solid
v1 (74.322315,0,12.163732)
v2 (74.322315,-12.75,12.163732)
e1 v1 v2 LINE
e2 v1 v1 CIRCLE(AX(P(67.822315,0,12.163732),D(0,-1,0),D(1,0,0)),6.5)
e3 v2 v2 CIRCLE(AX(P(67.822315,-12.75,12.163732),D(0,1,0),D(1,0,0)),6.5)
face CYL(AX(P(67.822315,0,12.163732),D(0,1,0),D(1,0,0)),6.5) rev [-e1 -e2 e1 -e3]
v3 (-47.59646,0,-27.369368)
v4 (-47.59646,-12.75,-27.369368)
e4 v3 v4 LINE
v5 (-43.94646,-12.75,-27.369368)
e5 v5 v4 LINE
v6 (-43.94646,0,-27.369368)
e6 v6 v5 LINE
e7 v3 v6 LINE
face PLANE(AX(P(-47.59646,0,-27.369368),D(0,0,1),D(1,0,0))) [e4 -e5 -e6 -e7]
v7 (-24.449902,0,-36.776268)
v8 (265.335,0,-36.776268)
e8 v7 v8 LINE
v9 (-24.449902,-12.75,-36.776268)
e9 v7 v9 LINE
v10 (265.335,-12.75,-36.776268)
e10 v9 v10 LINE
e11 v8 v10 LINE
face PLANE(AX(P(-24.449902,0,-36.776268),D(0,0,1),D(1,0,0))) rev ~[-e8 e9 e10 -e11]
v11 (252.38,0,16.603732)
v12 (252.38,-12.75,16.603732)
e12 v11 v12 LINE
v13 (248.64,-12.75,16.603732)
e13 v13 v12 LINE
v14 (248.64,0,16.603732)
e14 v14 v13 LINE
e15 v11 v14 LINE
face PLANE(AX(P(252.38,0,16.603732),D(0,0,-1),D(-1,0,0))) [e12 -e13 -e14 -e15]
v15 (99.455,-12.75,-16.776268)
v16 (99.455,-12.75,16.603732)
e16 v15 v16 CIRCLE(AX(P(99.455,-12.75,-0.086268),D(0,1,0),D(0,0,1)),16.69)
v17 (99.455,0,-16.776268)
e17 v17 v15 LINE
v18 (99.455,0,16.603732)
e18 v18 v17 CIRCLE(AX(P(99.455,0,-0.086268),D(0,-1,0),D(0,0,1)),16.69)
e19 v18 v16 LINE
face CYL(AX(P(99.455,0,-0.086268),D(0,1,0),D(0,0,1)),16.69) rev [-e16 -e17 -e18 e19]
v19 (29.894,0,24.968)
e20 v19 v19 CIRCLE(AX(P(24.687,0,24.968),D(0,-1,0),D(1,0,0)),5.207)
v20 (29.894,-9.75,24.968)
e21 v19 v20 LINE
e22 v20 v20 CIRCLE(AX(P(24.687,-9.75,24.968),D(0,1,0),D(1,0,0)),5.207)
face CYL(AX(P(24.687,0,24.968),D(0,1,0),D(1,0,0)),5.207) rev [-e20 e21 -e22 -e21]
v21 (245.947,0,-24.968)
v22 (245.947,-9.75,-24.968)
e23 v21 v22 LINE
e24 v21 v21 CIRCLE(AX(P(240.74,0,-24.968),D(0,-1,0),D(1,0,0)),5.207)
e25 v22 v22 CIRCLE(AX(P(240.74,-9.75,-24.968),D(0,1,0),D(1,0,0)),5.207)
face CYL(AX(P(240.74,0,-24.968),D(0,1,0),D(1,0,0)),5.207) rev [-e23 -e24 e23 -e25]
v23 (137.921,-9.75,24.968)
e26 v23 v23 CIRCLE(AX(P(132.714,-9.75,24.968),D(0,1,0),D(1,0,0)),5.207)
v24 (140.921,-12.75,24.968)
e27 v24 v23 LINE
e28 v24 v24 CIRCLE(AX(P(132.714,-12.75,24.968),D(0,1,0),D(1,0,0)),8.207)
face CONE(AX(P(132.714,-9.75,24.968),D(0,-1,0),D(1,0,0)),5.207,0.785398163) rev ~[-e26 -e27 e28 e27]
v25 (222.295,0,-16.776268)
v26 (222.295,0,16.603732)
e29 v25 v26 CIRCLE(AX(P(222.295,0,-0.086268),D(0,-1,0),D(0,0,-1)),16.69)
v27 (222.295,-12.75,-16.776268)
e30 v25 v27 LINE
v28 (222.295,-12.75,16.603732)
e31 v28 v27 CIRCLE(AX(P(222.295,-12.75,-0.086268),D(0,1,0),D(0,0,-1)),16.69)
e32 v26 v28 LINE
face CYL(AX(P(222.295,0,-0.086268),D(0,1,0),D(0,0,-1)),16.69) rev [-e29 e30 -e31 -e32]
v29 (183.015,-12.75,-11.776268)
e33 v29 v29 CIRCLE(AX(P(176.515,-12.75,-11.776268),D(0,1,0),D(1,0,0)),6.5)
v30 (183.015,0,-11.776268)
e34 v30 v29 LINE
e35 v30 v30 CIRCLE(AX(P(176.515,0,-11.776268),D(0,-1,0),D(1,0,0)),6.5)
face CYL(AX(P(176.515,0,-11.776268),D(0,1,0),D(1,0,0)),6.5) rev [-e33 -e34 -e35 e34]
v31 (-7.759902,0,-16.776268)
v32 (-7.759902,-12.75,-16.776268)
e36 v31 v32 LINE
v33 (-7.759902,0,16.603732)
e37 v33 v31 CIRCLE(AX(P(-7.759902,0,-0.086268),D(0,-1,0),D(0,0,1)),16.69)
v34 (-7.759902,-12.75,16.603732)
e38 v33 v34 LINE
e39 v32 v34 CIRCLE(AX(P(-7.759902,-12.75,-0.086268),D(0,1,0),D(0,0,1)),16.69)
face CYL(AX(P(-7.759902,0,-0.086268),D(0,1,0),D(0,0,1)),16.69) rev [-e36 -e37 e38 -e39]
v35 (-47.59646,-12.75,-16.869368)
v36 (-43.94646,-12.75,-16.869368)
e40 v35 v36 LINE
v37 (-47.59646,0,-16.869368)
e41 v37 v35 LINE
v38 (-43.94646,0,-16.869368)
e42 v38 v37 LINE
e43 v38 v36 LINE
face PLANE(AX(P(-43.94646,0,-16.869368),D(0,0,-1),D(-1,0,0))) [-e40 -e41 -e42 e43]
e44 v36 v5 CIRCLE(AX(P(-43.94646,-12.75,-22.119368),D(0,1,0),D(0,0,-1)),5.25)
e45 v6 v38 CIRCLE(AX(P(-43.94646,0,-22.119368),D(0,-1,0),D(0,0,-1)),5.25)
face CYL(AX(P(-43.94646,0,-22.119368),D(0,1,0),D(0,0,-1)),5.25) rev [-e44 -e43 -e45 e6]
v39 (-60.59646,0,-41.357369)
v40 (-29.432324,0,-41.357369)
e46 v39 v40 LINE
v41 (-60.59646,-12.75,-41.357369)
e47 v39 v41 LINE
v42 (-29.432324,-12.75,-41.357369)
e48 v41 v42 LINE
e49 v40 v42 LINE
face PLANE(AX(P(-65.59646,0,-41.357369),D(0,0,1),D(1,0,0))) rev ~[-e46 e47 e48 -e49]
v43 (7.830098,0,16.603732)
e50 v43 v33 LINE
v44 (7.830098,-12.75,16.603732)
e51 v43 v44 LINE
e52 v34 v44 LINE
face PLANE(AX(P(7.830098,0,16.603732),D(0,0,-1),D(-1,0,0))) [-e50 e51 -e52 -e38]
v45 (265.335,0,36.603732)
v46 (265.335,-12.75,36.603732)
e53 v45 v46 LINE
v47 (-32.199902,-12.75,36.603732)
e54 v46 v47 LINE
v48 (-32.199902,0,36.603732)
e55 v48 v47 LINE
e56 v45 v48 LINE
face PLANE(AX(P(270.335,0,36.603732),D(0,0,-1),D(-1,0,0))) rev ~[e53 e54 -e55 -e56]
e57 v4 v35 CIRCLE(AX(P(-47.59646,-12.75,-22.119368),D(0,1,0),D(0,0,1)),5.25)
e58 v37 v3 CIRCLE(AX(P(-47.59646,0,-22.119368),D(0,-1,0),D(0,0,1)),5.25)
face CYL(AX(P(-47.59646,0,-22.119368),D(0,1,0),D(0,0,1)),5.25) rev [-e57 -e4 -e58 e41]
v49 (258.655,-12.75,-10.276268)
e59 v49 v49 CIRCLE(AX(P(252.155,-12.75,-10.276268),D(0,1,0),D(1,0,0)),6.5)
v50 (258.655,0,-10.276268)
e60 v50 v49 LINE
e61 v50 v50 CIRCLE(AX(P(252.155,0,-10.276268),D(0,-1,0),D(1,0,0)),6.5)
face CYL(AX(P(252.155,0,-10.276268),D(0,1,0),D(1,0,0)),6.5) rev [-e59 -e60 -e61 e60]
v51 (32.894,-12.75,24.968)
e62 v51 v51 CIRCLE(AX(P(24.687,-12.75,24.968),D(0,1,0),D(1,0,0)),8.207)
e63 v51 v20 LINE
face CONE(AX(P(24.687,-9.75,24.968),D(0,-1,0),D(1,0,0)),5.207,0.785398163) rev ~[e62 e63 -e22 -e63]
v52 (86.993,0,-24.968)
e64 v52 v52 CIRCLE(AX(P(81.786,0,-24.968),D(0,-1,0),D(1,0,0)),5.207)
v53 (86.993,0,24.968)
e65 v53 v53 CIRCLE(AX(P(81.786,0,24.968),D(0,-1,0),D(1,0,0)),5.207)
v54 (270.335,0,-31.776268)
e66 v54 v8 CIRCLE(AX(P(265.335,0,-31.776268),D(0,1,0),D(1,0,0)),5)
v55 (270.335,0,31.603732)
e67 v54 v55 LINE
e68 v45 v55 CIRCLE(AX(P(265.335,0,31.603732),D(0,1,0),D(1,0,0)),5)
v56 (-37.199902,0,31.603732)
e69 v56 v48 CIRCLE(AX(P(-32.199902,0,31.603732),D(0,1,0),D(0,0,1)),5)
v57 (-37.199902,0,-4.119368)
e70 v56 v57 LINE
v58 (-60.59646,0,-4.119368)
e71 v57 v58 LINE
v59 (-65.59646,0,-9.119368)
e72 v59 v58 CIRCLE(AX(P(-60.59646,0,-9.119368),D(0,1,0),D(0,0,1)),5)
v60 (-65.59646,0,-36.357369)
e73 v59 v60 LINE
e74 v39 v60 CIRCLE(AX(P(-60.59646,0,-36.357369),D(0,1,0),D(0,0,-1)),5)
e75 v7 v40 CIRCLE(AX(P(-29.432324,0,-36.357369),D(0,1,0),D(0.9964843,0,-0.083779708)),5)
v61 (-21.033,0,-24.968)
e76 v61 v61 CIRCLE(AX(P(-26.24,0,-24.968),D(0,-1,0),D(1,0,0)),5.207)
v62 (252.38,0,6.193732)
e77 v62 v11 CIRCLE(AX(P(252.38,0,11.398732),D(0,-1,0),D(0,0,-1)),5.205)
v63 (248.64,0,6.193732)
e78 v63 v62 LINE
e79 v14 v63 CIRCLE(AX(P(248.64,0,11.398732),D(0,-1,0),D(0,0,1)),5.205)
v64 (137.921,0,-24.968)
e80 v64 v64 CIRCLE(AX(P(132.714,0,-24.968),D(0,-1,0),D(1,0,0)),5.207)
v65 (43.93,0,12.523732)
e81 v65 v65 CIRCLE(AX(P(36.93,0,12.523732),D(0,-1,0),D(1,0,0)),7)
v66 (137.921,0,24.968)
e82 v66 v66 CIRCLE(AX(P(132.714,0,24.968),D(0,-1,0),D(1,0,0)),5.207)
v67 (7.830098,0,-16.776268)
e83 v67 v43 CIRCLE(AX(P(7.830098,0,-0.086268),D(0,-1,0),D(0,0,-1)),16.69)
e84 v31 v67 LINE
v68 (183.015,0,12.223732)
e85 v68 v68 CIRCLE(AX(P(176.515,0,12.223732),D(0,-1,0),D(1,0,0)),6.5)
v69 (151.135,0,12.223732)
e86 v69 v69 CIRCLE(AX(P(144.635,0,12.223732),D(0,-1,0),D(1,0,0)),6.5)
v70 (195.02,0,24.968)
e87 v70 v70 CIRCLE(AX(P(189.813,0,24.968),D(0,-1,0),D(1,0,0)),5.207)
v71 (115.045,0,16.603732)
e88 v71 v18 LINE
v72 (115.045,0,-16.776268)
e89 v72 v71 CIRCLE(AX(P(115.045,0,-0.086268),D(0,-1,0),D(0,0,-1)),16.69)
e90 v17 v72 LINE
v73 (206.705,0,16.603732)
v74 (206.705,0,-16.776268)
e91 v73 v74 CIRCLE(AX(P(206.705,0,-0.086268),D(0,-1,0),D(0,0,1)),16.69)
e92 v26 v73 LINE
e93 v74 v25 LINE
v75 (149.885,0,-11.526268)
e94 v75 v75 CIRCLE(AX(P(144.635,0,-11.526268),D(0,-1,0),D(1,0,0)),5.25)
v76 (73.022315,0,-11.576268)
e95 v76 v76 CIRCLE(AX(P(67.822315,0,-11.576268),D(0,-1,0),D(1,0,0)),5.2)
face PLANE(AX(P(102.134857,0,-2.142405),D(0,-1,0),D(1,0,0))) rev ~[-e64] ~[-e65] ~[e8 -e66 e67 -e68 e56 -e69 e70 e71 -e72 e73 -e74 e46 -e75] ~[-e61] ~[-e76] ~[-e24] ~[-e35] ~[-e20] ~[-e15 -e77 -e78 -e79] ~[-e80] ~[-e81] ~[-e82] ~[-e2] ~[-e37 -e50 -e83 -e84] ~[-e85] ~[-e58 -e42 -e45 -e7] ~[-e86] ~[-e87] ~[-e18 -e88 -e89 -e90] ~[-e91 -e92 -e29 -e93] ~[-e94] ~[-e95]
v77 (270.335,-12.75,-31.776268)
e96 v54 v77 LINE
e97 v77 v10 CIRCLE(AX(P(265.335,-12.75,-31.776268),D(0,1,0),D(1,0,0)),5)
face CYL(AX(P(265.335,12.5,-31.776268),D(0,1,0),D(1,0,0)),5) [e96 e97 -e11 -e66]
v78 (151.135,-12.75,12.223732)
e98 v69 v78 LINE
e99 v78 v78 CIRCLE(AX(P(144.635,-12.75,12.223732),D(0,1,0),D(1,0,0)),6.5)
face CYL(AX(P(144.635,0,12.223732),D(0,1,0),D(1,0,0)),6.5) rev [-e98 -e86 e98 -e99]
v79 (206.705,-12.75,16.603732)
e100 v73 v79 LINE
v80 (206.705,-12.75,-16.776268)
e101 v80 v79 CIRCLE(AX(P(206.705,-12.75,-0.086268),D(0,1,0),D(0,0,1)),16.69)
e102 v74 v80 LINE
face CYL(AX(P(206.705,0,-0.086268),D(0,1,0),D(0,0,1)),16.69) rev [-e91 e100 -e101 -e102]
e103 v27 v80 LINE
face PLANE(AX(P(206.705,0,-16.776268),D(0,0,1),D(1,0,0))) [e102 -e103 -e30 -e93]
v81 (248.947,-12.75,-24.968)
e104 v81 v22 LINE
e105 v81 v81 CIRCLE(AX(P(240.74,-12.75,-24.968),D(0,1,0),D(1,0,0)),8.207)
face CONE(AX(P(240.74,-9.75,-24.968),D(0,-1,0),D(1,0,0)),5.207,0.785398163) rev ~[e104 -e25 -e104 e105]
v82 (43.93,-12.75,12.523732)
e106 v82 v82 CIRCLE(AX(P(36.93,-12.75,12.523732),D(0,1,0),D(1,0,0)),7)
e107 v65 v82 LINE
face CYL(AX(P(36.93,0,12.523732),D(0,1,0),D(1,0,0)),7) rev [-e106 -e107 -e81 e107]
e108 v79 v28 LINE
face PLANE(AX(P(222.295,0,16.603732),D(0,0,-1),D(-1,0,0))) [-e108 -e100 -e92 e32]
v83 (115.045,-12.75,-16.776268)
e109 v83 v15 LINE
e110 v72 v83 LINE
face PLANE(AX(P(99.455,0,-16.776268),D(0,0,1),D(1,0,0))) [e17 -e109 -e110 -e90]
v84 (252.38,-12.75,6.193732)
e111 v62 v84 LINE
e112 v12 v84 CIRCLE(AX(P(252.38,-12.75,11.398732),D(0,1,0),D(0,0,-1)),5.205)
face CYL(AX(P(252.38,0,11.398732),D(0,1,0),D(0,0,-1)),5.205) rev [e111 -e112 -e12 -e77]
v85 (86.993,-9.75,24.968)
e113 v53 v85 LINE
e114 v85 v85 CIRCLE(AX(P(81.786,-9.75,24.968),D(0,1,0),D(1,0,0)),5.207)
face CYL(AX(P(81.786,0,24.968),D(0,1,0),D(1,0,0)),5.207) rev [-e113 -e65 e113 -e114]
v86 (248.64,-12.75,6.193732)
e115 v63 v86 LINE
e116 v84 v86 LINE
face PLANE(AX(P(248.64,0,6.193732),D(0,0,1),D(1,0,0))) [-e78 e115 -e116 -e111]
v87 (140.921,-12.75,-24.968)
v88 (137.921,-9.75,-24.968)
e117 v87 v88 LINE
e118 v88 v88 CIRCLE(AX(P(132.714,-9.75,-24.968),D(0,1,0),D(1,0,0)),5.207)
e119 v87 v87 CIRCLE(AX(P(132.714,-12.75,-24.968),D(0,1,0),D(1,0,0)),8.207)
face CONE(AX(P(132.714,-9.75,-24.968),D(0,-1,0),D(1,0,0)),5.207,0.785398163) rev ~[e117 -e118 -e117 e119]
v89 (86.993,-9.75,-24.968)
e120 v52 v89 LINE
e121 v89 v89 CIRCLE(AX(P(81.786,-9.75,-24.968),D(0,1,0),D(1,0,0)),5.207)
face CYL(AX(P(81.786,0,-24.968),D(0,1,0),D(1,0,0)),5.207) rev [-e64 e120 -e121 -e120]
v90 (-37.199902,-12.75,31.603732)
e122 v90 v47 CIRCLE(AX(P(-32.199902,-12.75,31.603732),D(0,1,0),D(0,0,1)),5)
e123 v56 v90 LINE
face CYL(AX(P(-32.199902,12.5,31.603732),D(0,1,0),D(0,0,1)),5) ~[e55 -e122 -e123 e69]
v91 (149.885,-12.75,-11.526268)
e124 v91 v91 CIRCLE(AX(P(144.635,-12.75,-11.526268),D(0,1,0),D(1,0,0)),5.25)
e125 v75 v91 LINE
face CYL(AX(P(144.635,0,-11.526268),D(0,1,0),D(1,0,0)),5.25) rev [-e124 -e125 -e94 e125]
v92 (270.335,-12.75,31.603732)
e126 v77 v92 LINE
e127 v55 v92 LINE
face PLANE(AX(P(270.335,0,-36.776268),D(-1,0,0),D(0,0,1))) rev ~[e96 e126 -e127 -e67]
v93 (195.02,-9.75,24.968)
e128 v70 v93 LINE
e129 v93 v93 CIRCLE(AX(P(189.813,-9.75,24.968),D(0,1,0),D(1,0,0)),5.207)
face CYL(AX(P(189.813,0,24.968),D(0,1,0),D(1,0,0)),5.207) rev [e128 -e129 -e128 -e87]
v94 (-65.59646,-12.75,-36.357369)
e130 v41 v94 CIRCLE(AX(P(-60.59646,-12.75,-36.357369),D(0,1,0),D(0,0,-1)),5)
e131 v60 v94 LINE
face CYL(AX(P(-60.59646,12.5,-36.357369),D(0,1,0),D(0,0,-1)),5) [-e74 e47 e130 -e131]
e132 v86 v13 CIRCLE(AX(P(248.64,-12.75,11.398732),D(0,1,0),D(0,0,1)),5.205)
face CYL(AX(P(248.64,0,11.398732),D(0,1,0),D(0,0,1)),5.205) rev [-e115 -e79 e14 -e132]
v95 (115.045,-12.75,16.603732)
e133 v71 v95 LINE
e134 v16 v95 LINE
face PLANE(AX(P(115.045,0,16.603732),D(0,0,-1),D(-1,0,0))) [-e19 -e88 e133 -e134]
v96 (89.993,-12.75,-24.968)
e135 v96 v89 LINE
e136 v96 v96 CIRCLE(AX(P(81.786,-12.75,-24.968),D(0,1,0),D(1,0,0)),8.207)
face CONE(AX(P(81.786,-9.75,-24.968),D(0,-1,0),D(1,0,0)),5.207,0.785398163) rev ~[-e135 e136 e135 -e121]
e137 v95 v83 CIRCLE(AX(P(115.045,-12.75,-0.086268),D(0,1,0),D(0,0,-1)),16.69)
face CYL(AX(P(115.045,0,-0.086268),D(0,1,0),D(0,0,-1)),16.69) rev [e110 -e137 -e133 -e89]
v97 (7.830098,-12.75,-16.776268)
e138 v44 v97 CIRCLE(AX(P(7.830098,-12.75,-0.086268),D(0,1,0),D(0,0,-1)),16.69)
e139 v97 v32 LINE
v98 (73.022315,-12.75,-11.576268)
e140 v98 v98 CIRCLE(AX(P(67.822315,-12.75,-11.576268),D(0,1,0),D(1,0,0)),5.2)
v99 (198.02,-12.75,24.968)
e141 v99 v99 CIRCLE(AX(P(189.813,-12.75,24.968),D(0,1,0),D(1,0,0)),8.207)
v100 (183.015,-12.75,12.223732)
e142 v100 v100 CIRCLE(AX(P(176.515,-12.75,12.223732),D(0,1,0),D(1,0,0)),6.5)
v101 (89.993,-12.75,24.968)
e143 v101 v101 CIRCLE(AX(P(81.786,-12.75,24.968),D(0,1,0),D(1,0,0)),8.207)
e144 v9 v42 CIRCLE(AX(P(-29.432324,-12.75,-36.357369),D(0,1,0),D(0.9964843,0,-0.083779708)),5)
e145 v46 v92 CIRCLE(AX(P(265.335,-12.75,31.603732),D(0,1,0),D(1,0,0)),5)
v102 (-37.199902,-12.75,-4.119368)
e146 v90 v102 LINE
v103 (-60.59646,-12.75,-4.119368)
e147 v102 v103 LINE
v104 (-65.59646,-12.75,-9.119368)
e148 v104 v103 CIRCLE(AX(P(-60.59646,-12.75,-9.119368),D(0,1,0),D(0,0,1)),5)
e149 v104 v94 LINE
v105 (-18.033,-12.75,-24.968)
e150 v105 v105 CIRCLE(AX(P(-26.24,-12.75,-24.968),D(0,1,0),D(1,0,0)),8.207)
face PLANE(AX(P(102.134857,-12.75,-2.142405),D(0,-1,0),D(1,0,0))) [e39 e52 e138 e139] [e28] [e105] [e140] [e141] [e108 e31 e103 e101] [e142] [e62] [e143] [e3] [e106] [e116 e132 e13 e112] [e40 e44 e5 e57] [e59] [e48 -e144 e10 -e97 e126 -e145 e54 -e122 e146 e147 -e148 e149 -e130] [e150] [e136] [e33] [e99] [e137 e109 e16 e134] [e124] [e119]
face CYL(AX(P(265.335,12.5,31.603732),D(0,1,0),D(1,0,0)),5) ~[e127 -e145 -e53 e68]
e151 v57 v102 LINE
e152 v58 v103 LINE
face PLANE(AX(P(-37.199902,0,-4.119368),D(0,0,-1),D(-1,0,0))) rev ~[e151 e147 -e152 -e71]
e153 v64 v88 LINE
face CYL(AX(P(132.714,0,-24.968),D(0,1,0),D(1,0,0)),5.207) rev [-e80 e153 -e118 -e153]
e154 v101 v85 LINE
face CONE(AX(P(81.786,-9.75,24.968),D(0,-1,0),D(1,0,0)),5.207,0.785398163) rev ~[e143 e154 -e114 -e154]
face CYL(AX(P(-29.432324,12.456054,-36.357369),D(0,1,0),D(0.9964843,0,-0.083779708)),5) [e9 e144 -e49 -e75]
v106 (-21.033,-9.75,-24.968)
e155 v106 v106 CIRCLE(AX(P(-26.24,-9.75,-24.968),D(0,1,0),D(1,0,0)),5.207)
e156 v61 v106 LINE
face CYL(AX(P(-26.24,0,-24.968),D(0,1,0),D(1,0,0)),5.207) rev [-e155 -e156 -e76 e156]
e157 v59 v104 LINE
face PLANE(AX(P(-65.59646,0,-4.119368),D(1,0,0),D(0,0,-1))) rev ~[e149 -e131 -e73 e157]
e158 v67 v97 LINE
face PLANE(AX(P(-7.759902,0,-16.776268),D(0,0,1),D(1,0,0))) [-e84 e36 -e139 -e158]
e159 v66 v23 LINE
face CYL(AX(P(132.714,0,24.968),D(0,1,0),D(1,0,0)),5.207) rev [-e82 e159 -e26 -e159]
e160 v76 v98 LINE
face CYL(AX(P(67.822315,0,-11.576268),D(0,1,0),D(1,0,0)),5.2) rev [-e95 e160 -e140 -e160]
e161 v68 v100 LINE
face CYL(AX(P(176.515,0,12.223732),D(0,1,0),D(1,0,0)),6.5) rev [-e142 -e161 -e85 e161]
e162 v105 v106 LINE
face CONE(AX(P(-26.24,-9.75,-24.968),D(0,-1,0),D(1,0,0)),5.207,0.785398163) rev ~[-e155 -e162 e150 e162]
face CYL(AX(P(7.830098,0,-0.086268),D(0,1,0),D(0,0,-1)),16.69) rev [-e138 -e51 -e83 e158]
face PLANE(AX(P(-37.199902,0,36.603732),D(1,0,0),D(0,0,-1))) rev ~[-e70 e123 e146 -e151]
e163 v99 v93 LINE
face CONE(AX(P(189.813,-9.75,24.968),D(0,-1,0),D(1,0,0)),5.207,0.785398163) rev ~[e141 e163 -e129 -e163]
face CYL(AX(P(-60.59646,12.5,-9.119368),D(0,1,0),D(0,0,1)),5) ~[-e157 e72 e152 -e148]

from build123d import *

# Parameters (mm, degrees)
F2_DEPTH    = 12.75
F0_R        = 7
F0_R_2      = 6.5
F0_R_3      = 5.2
F0_R_4      = 5.25
F3_DEPTH    = 25
F4_T1_DEPTH = 37.75
F4_T3_DEPTH = 37.6621075041
F5_R        = 5.207
F6_DEPTH    = 25
F7_SIZE     = 3


# Not quite as in the source:
# - a fillet or chamfer that OpenCascade refuses, or shapes differently, is made with other operations: its cross-section is extruded or revolved along the edge and cut away or added


with BuildPart() as f2:
    # F1 (on Front) → F2 (new body)
    with BuildSketch(Plane.XZ):
        Polygon((270.335, 36.6037324816), (-37.1999023023, 36.6037324816), (-37.1999023023, -4.1193680316), (-65.5964598894, -4.1193680316), (-65.5964598894, -41.3573689769), (-24.4499023023, -41.3573689769), (-24.4499023023, -36.7762675184), (270.335, -36.7762675184), align=None)
    extrude(amount=F2_DEPTH)

    # F0 (on Front) → F3 (cut)
    with BuildSketch(Plane.XZ):
        with BuildLine():
            Line((7.8300976977, 16.6037324816), (-7.7599023023, 16.6037324816))
            ThreePointArc((-7.7599023023, 16.6037324816), (-24.4499023023, -0.0862675184), (-7.7599023023, -16.7762675184))
            Line((-7.7599023023, -16.7762675184), (7.8300976977, -16.7762675184))
            ThreePointArc((7.8300976977, -16.7762675184), (24.5200976977, -0.0862675184), (7.8300976977, 16.6037324816))
        make_face()
        with BuildLine():
            Line((115.045, 16.6037324816), (99.455, 16.6037324816))
            ThreePointArc((99.455, 16.6037324816), (82.765, -0.0862675184), (99.455, -16.7762675184))
            Line((99.455, -16.7762675184), (115.045, -16.7762675184))
            ThreePointArc((115.045, -16.7762675184), (131.735, -0.0862675184), (115.045, 16.6037324816))
        make_face()
        with BuildLine():
            Line((222.295, 16.6037324816), (206.705, 16.6037324816))
            ThreePointArc((206.705, 16.6037324816), (190.015, -0.0862675184), (206.705, -16.7762675184))
            Line((206.705, -16.7762675184), (222.295, -16.7762675184))
            ThreePointArc((222.295, -16.7762675184), (238.985, -0.0862675184), (222.295, 16.6037324816))
        make_face()
        with Locations((36.93, 12.5237324816)):
            Circle(F0_R)
        with Locations((67.822315464, 12.1637324816)):
            Circle(F0_R_2)
        with Locations((67.822315464, -11.5762675184)):
            Circle(F0_R_3)
        with BuildLine():
            Line((-43.9464598894, -16.8693680316), (-47.5964598894, -16.8693680316))
            ThreePointArc((-47.5964598894, -16.8693680316), (-52.8464598894, -22.1193680316), (-47.5964598894, -27.3693680316))
            Line((-47.5964598894, -27.3693680316), (-43.9464598894, -27.3693680316))
            ThreePointArc((-43.9464598894, -27.3693680316), (-38.6964598894, -22.1193680316), (-43.9464598894, -16.8693680316))
        make_face()
        with Locations((144.635, 12.2237324816)):
            Circle(F0_R_2)
        with Locations((144.635, -11.5262675184)):
            Circle(F0_R_4)
        with Locations((176.515, 12.2237324816)):
            Circle(F0_R_2)
        with Locations((176.515, -11.7762675184)):
            Circle(F0_R_2)
        with BuildLine():
            Line((252.38, 16.6037324816), (248.64, 16.6037324816))
            ThreePointArc((248.64, 16.6037324816), (243.435, 11.3987324816), (248.64, 6.1937324816))
            Line((248.64, 6.1937324816), (252.38, 6.1937324816))
            ThreePointArc((252.38, 6.1937324816), (257.585, 11.3987324816), (252.38, 16.6037324816))
        make_face()
        with Locations((252.155, -10.2762675184)):
            Circle(F0_R_2)
    extrude(amount=F3_DEPTH, mode=Mode.SUBTRACT)

    # F4: fillet of radius 5 on 6 edges, made by hand

    # F4_s2 → F4_t1 (cut)
    with BuildSketch(Plane.XZ.offset(-12.5)):
        with BuildLine():
            ThreePointArc((-32.1999023023, 36.6037324816), (-35.7354362082, 35.1392663875), (-37.1999023023, 31.6037324816))
            Line((-37.1999023023, 31.6037324816), (-37.1999023023, 36.6037324816))
            Line((-37.1999023023, 36.6037324816), (-32.1999023023, 36.6037324816))
        make_face()
        with BuildLine():
            ThreePointArc((-60.5964598894, -4.1193680316), (-64.1319937953, -5.5838341257), (-65.5964598894, -9.1193680316))
            Line((-65.5964598894, -9.1193680316), (-65.5964598894, -4.1193680316))
            Line((-65.5964598894, -4.1193680316), (-60.5964598894, -4.1193680316))
        make_face()
        with BuildLine():
            ThreePointArc((-60.5964598894, -41.3573689769), (-64.1319937953, -39.8929028828), (-65.5964598894, -36.3573689769))
            Line((-65.5964598894, -36.3573689769), (-65.5964598894, -41.3573689769))
            Line((-65.5964598894, -41.3573689769), (-60.5964598894, -41.3573689769))
        make_face()
        with BuildLine():
            ThreePointArc((270.335, 31.6037324816), (268.8705339059, 35.1392663875), (265.335, 36.6037324816))
            Line((265.335, 36.6037324816), (270.335, 36.6037324816))
            Line((270.335, 36.6037324816), (270.335, 31.6037324816))
        make_face()
        with BuildLine():
            ThreePointArc((270.335, -31.7762675184), (268.8705339059, -35.3118014243), (265.335, -36.7762675184))
            Line((265.335, -36.7762675184), (270.335, -36.7762675184))
            Line((270.335, -36.7762675184), (270.335, -31.7762675184))
        make_face()
    extrude(amount=F4_T1_DEPTH, mode=Mode.SUBTRACT)

    # F4_s4 → F4_t3 (cut)
    with BuildSketch(Plane.XZ.offset(-12.4560537521)):
        with BuildLine():
            ThreePointArc((-24.4499023023, -36.7762675184), (-26.0481320759, -40.03802739), (-29.4323238031, -41.3573689769))
            Line((-29.4323238031, -41.3573689769), (-24.4499023023, -41.3573689769))
            Line((-24.4499023023, -41.3573689769), (-24.4499023023, -36.7762675184))
        make_face()
    extrude(amount=F4_T3_DEPTH, mode=Mode.SUBTRACT)

    # F5 (on Front) → F6 (cut)
    with BuildSketch(Plane.XZ):
        with Locations((132.714, 24.968)):
            Circle(F5_R)
        with Locations((132.714, -24.968)):
            Circle(F5_R)
        with Locations((81.786, -24.968)):
            Circle(F5_R)
        with Locations((81.786, 24.968)):
            Circle(F5_R)
        with Locations((240.74, -24.968)):
            Circle(F5_R)
        with Locations((-26.24, -24.968)):
            Circle(F5_R)
        with Locations((24.687, 24.968)):
            Circle(F5_R)
        with Locations((189.813, 24.968)):
            Circle(F5_R)
    extrude(amount=F6_DEPTH, mode=Mode.SUBTRACT)

    # F7
    f7_edges = [f2.edges().sort_by_distance(p)[0] for p in [
        (19.48, -12.75, 24.968),
        (-31.447, -12.75, -24.968),
        (76.579, -12.75, 24.968),
        (127.507, -12.75, 24.968),
        (127.507, -12.75, -24.968),
        (76.579, -12.75, -24.968),
        (184.606, -12.75, 24.968),
        (235.533, -12.75, -24.968),
    ]]
    chamfer(f7_edges, length=F7_SIZE)


solid = f2.part
